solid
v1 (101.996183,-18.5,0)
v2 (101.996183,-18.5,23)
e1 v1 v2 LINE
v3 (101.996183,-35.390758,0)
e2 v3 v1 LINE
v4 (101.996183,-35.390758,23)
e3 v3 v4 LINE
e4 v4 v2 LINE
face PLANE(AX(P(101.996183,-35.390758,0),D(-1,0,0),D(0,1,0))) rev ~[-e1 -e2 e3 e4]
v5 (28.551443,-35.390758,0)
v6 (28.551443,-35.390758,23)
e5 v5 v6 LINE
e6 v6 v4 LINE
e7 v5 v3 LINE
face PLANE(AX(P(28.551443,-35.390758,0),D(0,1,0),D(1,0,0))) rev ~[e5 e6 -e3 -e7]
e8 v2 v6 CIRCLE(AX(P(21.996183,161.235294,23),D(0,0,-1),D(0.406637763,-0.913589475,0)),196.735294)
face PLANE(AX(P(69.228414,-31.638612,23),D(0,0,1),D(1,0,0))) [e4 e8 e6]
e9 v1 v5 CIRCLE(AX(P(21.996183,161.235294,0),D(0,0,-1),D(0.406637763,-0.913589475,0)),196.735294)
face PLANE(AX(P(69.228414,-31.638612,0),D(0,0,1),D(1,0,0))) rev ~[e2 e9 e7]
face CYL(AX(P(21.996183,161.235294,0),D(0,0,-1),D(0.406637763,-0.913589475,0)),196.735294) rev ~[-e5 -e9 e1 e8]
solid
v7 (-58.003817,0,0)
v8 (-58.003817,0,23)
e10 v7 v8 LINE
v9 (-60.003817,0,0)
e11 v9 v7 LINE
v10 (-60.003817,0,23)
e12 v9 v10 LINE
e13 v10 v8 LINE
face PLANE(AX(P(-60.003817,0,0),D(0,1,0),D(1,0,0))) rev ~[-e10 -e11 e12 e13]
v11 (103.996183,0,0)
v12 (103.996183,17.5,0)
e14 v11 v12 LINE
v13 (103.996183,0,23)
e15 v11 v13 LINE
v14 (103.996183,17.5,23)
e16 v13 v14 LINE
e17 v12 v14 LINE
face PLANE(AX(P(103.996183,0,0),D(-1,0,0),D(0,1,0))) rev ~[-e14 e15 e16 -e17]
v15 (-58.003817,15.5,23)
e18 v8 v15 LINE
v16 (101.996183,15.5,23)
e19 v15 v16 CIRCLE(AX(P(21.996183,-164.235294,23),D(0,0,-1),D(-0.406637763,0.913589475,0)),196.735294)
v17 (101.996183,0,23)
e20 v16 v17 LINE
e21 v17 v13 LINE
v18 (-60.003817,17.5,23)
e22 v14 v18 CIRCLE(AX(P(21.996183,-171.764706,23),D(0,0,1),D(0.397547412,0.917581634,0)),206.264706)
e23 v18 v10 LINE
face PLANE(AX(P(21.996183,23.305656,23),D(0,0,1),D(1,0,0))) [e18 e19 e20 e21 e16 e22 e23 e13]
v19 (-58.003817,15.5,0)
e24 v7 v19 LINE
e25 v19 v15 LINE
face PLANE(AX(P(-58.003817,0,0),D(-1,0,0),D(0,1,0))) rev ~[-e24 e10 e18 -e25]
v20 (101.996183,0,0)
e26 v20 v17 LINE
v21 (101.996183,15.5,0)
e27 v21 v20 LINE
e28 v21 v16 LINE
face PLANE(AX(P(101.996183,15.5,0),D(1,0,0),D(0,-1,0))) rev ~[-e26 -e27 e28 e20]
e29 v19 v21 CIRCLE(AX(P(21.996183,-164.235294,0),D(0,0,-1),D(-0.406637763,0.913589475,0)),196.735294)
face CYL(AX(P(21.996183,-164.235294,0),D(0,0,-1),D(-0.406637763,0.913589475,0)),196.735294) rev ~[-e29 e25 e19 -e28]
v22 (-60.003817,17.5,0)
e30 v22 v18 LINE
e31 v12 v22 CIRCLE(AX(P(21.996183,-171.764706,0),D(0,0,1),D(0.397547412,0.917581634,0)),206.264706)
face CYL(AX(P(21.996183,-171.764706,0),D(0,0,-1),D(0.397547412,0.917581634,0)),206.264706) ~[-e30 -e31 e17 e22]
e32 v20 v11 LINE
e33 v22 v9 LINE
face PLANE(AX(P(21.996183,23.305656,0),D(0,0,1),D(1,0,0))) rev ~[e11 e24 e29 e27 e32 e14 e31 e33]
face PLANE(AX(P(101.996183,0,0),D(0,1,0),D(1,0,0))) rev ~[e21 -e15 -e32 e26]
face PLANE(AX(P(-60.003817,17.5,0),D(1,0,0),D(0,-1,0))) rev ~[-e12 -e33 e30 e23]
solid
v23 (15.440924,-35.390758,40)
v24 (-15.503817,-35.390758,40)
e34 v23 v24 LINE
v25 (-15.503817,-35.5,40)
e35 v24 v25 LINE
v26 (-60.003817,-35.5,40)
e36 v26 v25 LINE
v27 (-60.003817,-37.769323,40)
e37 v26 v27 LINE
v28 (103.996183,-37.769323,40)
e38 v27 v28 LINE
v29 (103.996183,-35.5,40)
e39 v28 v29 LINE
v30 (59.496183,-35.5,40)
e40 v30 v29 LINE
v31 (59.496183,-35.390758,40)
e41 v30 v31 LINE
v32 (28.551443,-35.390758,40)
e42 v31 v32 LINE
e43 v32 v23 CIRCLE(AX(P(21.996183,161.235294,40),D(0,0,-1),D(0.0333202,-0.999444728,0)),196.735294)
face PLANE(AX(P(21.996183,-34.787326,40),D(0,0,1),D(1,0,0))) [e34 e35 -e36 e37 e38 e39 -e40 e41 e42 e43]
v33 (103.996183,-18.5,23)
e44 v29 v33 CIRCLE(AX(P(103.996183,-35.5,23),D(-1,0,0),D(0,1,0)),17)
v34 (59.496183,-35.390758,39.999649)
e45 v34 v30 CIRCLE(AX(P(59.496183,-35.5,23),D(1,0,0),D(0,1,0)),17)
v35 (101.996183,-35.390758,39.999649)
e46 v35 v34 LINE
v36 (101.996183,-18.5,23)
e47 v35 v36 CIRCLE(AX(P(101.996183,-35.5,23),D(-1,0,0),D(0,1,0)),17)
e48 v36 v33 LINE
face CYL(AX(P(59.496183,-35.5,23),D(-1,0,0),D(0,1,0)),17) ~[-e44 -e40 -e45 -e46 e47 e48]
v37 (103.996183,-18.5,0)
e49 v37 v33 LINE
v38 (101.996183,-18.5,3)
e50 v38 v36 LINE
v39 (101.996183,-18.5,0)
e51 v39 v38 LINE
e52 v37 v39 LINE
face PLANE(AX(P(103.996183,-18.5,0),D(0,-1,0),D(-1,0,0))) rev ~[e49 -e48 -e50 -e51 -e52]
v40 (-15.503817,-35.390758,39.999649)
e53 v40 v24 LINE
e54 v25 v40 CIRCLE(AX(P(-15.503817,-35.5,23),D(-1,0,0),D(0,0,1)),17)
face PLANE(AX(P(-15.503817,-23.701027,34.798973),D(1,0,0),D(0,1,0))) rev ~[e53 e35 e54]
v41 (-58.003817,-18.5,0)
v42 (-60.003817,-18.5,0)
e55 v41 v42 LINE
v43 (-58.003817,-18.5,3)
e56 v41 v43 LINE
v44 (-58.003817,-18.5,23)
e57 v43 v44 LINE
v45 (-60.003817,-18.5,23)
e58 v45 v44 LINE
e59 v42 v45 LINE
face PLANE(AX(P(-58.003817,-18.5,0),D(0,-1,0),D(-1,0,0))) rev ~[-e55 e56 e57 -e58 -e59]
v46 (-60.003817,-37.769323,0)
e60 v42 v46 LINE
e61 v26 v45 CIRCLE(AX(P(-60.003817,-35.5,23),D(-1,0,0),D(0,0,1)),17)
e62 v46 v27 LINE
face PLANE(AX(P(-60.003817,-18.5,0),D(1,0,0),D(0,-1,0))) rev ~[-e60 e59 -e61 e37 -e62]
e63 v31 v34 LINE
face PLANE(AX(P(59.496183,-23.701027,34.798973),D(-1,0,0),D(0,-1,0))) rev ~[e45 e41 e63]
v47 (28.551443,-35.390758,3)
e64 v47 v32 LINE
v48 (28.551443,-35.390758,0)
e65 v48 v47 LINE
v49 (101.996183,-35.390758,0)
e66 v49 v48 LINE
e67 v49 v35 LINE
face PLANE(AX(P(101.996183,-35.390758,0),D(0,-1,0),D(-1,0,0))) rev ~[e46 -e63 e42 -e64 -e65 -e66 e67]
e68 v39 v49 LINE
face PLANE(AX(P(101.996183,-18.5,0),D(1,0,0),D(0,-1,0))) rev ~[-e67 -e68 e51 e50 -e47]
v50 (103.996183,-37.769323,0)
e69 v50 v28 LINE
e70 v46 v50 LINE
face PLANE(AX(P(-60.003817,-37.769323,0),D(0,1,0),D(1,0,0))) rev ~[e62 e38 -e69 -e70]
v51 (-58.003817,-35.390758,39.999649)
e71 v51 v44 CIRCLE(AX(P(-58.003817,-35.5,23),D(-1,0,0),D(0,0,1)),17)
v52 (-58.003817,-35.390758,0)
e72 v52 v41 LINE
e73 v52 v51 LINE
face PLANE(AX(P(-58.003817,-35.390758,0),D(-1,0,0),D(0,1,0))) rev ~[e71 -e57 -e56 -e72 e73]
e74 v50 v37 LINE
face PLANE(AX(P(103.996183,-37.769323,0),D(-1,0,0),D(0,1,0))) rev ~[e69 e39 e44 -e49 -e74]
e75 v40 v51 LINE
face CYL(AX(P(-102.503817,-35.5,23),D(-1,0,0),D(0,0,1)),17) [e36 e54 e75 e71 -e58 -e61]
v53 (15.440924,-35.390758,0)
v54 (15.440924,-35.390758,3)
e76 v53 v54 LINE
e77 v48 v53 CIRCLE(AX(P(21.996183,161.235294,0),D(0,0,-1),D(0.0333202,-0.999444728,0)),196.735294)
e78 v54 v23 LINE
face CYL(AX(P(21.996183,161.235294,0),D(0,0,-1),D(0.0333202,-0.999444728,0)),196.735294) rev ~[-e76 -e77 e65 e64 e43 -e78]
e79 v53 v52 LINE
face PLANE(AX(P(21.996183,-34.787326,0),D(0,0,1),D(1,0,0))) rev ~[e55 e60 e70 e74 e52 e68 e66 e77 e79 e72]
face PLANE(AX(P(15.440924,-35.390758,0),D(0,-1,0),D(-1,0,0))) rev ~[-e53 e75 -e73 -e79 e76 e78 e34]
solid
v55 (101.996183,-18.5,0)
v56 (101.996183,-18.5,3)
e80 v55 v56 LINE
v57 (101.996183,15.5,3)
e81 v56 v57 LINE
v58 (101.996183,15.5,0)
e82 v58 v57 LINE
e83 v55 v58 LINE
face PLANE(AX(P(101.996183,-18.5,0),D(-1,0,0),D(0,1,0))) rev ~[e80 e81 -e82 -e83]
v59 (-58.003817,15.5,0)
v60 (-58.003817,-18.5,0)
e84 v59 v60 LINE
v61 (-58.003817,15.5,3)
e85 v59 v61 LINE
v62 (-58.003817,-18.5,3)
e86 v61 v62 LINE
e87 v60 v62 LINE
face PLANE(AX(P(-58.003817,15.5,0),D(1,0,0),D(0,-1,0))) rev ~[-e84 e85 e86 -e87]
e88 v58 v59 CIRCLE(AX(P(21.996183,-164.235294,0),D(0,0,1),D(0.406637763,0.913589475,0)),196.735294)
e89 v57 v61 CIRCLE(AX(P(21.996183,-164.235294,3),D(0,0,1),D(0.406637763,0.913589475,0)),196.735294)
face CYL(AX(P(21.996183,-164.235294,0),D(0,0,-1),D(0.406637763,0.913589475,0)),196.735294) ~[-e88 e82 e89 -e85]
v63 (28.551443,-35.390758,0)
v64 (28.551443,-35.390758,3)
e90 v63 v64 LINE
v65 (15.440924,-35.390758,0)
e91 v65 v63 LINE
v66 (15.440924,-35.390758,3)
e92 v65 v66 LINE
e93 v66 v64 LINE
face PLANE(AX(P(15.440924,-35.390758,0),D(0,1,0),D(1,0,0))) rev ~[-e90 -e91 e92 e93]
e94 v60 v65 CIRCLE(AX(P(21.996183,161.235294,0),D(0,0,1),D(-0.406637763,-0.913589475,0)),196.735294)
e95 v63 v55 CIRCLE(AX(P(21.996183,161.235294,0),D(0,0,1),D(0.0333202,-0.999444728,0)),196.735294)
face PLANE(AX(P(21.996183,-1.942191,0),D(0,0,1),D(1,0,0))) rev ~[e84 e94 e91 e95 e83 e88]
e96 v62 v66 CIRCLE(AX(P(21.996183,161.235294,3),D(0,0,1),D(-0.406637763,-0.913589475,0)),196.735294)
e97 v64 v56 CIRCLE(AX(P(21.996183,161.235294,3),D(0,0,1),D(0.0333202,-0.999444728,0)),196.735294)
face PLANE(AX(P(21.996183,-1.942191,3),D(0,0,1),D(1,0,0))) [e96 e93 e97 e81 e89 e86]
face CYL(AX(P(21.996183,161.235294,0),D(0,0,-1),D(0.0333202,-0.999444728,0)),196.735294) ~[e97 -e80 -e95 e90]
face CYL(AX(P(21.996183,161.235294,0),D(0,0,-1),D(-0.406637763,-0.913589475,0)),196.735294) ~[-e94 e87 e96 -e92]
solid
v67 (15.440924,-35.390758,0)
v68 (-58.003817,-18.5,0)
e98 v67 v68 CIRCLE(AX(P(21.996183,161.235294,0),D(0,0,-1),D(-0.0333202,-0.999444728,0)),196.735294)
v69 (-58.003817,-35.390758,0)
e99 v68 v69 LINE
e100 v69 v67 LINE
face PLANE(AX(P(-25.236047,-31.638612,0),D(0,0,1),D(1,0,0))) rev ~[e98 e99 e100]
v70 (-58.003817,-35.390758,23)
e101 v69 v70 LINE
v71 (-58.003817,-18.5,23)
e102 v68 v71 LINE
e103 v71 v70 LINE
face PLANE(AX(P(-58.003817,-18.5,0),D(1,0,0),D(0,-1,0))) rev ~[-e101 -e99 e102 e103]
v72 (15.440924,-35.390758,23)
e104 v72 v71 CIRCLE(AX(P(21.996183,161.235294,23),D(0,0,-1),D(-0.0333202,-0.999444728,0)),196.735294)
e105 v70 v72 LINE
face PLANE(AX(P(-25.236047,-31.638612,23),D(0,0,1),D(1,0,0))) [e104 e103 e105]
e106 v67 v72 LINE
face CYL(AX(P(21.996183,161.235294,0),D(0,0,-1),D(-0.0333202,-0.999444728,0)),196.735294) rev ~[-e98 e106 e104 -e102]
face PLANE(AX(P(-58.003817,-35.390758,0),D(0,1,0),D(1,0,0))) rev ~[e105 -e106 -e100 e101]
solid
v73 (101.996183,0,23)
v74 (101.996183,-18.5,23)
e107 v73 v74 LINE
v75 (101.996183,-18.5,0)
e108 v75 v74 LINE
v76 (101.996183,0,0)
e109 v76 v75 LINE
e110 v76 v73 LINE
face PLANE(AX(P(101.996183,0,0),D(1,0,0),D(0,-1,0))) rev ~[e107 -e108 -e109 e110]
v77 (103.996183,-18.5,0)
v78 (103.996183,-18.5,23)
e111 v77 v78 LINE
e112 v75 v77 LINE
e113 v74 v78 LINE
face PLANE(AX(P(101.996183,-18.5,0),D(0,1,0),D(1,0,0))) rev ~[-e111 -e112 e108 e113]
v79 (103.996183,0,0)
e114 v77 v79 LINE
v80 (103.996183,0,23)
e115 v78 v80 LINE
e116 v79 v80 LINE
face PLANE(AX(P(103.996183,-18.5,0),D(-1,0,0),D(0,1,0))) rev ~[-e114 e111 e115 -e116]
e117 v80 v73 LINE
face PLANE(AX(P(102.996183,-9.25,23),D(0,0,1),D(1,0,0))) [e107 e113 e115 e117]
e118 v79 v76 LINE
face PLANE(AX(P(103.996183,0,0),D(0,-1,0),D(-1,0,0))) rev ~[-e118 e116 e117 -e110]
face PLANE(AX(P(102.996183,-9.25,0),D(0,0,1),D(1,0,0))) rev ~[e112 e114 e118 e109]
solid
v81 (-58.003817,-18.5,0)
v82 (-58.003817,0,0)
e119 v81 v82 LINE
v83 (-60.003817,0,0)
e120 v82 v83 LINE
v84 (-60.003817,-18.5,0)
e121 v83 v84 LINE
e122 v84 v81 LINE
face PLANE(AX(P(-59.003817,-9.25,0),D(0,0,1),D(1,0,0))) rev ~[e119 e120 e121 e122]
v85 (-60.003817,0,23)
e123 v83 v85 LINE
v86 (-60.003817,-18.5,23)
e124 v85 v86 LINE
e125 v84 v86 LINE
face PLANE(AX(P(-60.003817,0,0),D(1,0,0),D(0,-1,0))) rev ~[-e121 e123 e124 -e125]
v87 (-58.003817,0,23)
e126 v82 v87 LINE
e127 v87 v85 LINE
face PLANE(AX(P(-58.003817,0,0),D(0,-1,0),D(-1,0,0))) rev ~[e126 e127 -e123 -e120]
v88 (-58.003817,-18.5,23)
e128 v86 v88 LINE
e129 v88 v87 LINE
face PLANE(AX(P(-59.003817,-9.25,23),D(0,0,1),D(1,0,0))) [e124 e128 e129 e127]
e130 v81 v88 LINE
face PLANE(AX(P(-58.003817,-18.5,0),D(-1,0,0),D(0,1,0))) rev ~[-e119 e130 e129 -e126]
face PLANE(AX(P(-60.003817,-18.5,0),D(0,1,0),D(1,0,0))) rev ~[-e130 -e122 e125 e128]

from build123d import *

# Parameters (mm, degrees)
F1_DEPTH    = 3
F2_DEPTH    = 40
F3_DEPTH    = 23
F4_DEPTH    = 23
F5_T1_DEPTH = 87
F6_T1_DEPTH = 87
F7_DEPTH    = 23
F8_DEPTH    = 23


# Not quite as in the source:
# - a fillet or chamfer that OpenCascade refuses, or shapes differently, is made with other operations: its cross-section is extruded or revolved along the edge and cut away or added


with BuildPart() as f1:
    # F0 (on Top) → F1 (new body)
    with BuildSketch(Plane.XY):
        with BuildLine():
            Line((-58.0038166074, 15.5), (-58.0038166074, 0))
            Line((-58.0038166074, 0), (-58.0038166074, -3))
            Line((-58.0038166074, -3), (-58.0038166074, -18.5))
            ThreePointArc((-58.0038166074, -18.5), (-22.0977805804, -30.4949807288), (15.4409240709, -35.3907583952))
            Line((15.4409240709, -35.3907583952), (28.5514427142, -35.3907583952))
            ThreePointArc((28.5514427142, -35.3907583952), (66.0901473656, -30.4949807288), (101.9961833926, -18.5))
            Line((101.9961833926, -18.5), (101.9961833926, -15.5))
            Line((101.9961833926, -15.5), (101.9961833926, -3))
            Line((101.9961833926, -3), (101.9961833926, 0))
            Line((101.9961833926, 0), (101.9961833926, 15.5))
            ThreePointArc((101.9961833926, 15.5), (21.9961833926, 32.5), (-58.0038166074, 15.5))
        make_face()
    extrude(amount=F1_DEPTH)

    # F0 (on Top) → F2 (join)
    with BuildSketch(Plane.XY):
        with BuildLine():
            Line((-58.0038166074, -35.3907583952), (-58.0038166074, -18.5))
            Line((-58.0038166074, -18.5), (-60.0038166074, -18.5))
            Line((-60.0038166074, -18.5), (-60.0038166074, -20.5))
            Line((-60.0038166074, -20.5), (-60.0038166074, -37.7693227232))
            Line((-60.0038166074, -37.7693227232), (103.9961833926, -37.7693227232))
            Line((103.9961833926, -37.7693227232), (103.9961833926, -20.5))
            Line((103.9961833926, -20.5), (103.9961833926, -18.5))
            Line((103.9961833926, -18.5), (101.9961833926, -18.5))
            Line((101.9961833926, -18.5), (101.9961833926, -35.3907583952))
            Line((101.9961833926, -35.3907583952), (28.5514427142, -35.3907583952))
            ThreePointArc((28.5514427142, -35.3907583952), (21.9961833926, -35.5), (15.4409240709, -35.3907583952))
            Line((15.4409240709, -35.3907583952), (-58.0038166074, -35.3907583952))
        make_face()
    extrude(amount=F2_DEPTH)

    # F5: fillet of radius 17 on 1 edges, made by hand

    # F5_s2 → F5_t1 (cut)
    with BuildSketch(Plane.YZ.offset(-102.5038166074)):
        with BuildLine():
            ThreePointArc((-35.5, 40), (-23.4791847198, 35.0208152802), (-18.5, 23))
            Line((-18.5, 23), (-18.5, 40))
            Line((-18.5, 40), (-35.5, 40))
        make_face()
    extrude(amount=F5_T1_DEPTH, mode=Mode.SUBTRACT)

    # F6: fillet of radius 17 on 1 edges, made by hand

    # F6_s2 → F6_t1 (cut)
    with BuildSketch(Plane.YZ.offset(59.4961833926)):
        with BuildLine():
            ThreePointArc((-18.5, 23), (-23.4791847198, 35.0208152802), (-35.5, 40))
            Line((-35.5, 40), (-18.5, 40))
            Line((-18.5, 40), (-18.5, 23))
        make_face()
    extrude(amount=F6_T1_DEPTH, mode=Mode.SUBTRACT)


with BuildPart() as f3:
    # F0 (on Top) → F3 (new body)
    with BuildSketch(Plane.XY):
        with BuildLine():
            Line((-60.0038166074, 0), (-58.0038166074, 0))
            Line((-58.0038166074, 0), (-58.0038166074, 15.5))
            ThreePointArc((-58.0038166074, 15.5), (21.9961833926, 32.5), (101.9961833926, 15.5))
            Line((101.9961833926, 15.5), (101.9961833926, 0))
            Line((101.9961833926, 0), (103.9961833926, 0))
            Line((103.9961833926, 0), (103.9961833926, 17.5))
            ThreePointArc((103.9961833926, 17.5), (21.9961833926, 34.5), (-60.0038166074, 17.5))
            Line((-60.0038166074, 17.5), (-60.0038166074, 0))
        make_face()
    extrude(amount=F3_DEPTH)


with BuildPart() as f4:
    # F0 (on Top) → F4 (new body)
    with BuildSketch(Plane.XY):
        with BuildLine():
            ThreePointArc((101.9961833926, -18.5), (66.0901473656, -30.4949807288), (28.5514427142, -35.3907583952))
            Line((28.5514427142, -35.3907583952), (101.9961833926, -35.3907583952))
            Line((101.9961833926, -35.3907583952), (101.9961833926, -18.5))
        make_face()
    extrude(amount=F4_DEPTH)


with BuildPart() as f4b:
    # F0 (on Top) → F4, piece 2 (new body)
    with BuildSketch(Plane.XY):
        with BuildLine():
            ThreePointArc((15.4409240709, -35.3907583952), (-22.0977805804, -30.4949807288), (-58.0038166074, -18.5))
            Line((-58.0038166074, -18.5), (-58.0038166074, -35.3907583952))
            Line((-58.0038166074, -35.3907583952), (15.4409240709, -35.3907583952))
        make_face()
    extrude(amount=F4_DEPTH)


with BuildPart() as f7:
    # F0 (on Top) → F7 (new body)
    with BuildSketch(Plane.XY):
        Polygon((-58.0038166074, -3), (-58.0038166074, 0), (-60.0038166074, 0), (-60.0038166074, -3), (-60.0038166074, -18.5), (-58.0038166074, -18.5), align=None)
    extrude(amount=F7_DEPTH)


with BuildPart() as f8:
    # F0 (on Top) → F8 (new body)
    with BuildSketch(Plane.XY):
        Polygon((103.9961833926, 0), (101.9961833926, 0), (101.9961833926, -3), (101.9961833926, -15.5), (101.9961833926, -18.5), (103.9961833926, -18.5), (103.9961833926, -17.5), (103.9961833926, -3), align=None)
    extrude(amount=F8_DEPTH)


solid = Compound([f1.part, f3.part, f4.part, f4b.part, f7.part, f8.part])
